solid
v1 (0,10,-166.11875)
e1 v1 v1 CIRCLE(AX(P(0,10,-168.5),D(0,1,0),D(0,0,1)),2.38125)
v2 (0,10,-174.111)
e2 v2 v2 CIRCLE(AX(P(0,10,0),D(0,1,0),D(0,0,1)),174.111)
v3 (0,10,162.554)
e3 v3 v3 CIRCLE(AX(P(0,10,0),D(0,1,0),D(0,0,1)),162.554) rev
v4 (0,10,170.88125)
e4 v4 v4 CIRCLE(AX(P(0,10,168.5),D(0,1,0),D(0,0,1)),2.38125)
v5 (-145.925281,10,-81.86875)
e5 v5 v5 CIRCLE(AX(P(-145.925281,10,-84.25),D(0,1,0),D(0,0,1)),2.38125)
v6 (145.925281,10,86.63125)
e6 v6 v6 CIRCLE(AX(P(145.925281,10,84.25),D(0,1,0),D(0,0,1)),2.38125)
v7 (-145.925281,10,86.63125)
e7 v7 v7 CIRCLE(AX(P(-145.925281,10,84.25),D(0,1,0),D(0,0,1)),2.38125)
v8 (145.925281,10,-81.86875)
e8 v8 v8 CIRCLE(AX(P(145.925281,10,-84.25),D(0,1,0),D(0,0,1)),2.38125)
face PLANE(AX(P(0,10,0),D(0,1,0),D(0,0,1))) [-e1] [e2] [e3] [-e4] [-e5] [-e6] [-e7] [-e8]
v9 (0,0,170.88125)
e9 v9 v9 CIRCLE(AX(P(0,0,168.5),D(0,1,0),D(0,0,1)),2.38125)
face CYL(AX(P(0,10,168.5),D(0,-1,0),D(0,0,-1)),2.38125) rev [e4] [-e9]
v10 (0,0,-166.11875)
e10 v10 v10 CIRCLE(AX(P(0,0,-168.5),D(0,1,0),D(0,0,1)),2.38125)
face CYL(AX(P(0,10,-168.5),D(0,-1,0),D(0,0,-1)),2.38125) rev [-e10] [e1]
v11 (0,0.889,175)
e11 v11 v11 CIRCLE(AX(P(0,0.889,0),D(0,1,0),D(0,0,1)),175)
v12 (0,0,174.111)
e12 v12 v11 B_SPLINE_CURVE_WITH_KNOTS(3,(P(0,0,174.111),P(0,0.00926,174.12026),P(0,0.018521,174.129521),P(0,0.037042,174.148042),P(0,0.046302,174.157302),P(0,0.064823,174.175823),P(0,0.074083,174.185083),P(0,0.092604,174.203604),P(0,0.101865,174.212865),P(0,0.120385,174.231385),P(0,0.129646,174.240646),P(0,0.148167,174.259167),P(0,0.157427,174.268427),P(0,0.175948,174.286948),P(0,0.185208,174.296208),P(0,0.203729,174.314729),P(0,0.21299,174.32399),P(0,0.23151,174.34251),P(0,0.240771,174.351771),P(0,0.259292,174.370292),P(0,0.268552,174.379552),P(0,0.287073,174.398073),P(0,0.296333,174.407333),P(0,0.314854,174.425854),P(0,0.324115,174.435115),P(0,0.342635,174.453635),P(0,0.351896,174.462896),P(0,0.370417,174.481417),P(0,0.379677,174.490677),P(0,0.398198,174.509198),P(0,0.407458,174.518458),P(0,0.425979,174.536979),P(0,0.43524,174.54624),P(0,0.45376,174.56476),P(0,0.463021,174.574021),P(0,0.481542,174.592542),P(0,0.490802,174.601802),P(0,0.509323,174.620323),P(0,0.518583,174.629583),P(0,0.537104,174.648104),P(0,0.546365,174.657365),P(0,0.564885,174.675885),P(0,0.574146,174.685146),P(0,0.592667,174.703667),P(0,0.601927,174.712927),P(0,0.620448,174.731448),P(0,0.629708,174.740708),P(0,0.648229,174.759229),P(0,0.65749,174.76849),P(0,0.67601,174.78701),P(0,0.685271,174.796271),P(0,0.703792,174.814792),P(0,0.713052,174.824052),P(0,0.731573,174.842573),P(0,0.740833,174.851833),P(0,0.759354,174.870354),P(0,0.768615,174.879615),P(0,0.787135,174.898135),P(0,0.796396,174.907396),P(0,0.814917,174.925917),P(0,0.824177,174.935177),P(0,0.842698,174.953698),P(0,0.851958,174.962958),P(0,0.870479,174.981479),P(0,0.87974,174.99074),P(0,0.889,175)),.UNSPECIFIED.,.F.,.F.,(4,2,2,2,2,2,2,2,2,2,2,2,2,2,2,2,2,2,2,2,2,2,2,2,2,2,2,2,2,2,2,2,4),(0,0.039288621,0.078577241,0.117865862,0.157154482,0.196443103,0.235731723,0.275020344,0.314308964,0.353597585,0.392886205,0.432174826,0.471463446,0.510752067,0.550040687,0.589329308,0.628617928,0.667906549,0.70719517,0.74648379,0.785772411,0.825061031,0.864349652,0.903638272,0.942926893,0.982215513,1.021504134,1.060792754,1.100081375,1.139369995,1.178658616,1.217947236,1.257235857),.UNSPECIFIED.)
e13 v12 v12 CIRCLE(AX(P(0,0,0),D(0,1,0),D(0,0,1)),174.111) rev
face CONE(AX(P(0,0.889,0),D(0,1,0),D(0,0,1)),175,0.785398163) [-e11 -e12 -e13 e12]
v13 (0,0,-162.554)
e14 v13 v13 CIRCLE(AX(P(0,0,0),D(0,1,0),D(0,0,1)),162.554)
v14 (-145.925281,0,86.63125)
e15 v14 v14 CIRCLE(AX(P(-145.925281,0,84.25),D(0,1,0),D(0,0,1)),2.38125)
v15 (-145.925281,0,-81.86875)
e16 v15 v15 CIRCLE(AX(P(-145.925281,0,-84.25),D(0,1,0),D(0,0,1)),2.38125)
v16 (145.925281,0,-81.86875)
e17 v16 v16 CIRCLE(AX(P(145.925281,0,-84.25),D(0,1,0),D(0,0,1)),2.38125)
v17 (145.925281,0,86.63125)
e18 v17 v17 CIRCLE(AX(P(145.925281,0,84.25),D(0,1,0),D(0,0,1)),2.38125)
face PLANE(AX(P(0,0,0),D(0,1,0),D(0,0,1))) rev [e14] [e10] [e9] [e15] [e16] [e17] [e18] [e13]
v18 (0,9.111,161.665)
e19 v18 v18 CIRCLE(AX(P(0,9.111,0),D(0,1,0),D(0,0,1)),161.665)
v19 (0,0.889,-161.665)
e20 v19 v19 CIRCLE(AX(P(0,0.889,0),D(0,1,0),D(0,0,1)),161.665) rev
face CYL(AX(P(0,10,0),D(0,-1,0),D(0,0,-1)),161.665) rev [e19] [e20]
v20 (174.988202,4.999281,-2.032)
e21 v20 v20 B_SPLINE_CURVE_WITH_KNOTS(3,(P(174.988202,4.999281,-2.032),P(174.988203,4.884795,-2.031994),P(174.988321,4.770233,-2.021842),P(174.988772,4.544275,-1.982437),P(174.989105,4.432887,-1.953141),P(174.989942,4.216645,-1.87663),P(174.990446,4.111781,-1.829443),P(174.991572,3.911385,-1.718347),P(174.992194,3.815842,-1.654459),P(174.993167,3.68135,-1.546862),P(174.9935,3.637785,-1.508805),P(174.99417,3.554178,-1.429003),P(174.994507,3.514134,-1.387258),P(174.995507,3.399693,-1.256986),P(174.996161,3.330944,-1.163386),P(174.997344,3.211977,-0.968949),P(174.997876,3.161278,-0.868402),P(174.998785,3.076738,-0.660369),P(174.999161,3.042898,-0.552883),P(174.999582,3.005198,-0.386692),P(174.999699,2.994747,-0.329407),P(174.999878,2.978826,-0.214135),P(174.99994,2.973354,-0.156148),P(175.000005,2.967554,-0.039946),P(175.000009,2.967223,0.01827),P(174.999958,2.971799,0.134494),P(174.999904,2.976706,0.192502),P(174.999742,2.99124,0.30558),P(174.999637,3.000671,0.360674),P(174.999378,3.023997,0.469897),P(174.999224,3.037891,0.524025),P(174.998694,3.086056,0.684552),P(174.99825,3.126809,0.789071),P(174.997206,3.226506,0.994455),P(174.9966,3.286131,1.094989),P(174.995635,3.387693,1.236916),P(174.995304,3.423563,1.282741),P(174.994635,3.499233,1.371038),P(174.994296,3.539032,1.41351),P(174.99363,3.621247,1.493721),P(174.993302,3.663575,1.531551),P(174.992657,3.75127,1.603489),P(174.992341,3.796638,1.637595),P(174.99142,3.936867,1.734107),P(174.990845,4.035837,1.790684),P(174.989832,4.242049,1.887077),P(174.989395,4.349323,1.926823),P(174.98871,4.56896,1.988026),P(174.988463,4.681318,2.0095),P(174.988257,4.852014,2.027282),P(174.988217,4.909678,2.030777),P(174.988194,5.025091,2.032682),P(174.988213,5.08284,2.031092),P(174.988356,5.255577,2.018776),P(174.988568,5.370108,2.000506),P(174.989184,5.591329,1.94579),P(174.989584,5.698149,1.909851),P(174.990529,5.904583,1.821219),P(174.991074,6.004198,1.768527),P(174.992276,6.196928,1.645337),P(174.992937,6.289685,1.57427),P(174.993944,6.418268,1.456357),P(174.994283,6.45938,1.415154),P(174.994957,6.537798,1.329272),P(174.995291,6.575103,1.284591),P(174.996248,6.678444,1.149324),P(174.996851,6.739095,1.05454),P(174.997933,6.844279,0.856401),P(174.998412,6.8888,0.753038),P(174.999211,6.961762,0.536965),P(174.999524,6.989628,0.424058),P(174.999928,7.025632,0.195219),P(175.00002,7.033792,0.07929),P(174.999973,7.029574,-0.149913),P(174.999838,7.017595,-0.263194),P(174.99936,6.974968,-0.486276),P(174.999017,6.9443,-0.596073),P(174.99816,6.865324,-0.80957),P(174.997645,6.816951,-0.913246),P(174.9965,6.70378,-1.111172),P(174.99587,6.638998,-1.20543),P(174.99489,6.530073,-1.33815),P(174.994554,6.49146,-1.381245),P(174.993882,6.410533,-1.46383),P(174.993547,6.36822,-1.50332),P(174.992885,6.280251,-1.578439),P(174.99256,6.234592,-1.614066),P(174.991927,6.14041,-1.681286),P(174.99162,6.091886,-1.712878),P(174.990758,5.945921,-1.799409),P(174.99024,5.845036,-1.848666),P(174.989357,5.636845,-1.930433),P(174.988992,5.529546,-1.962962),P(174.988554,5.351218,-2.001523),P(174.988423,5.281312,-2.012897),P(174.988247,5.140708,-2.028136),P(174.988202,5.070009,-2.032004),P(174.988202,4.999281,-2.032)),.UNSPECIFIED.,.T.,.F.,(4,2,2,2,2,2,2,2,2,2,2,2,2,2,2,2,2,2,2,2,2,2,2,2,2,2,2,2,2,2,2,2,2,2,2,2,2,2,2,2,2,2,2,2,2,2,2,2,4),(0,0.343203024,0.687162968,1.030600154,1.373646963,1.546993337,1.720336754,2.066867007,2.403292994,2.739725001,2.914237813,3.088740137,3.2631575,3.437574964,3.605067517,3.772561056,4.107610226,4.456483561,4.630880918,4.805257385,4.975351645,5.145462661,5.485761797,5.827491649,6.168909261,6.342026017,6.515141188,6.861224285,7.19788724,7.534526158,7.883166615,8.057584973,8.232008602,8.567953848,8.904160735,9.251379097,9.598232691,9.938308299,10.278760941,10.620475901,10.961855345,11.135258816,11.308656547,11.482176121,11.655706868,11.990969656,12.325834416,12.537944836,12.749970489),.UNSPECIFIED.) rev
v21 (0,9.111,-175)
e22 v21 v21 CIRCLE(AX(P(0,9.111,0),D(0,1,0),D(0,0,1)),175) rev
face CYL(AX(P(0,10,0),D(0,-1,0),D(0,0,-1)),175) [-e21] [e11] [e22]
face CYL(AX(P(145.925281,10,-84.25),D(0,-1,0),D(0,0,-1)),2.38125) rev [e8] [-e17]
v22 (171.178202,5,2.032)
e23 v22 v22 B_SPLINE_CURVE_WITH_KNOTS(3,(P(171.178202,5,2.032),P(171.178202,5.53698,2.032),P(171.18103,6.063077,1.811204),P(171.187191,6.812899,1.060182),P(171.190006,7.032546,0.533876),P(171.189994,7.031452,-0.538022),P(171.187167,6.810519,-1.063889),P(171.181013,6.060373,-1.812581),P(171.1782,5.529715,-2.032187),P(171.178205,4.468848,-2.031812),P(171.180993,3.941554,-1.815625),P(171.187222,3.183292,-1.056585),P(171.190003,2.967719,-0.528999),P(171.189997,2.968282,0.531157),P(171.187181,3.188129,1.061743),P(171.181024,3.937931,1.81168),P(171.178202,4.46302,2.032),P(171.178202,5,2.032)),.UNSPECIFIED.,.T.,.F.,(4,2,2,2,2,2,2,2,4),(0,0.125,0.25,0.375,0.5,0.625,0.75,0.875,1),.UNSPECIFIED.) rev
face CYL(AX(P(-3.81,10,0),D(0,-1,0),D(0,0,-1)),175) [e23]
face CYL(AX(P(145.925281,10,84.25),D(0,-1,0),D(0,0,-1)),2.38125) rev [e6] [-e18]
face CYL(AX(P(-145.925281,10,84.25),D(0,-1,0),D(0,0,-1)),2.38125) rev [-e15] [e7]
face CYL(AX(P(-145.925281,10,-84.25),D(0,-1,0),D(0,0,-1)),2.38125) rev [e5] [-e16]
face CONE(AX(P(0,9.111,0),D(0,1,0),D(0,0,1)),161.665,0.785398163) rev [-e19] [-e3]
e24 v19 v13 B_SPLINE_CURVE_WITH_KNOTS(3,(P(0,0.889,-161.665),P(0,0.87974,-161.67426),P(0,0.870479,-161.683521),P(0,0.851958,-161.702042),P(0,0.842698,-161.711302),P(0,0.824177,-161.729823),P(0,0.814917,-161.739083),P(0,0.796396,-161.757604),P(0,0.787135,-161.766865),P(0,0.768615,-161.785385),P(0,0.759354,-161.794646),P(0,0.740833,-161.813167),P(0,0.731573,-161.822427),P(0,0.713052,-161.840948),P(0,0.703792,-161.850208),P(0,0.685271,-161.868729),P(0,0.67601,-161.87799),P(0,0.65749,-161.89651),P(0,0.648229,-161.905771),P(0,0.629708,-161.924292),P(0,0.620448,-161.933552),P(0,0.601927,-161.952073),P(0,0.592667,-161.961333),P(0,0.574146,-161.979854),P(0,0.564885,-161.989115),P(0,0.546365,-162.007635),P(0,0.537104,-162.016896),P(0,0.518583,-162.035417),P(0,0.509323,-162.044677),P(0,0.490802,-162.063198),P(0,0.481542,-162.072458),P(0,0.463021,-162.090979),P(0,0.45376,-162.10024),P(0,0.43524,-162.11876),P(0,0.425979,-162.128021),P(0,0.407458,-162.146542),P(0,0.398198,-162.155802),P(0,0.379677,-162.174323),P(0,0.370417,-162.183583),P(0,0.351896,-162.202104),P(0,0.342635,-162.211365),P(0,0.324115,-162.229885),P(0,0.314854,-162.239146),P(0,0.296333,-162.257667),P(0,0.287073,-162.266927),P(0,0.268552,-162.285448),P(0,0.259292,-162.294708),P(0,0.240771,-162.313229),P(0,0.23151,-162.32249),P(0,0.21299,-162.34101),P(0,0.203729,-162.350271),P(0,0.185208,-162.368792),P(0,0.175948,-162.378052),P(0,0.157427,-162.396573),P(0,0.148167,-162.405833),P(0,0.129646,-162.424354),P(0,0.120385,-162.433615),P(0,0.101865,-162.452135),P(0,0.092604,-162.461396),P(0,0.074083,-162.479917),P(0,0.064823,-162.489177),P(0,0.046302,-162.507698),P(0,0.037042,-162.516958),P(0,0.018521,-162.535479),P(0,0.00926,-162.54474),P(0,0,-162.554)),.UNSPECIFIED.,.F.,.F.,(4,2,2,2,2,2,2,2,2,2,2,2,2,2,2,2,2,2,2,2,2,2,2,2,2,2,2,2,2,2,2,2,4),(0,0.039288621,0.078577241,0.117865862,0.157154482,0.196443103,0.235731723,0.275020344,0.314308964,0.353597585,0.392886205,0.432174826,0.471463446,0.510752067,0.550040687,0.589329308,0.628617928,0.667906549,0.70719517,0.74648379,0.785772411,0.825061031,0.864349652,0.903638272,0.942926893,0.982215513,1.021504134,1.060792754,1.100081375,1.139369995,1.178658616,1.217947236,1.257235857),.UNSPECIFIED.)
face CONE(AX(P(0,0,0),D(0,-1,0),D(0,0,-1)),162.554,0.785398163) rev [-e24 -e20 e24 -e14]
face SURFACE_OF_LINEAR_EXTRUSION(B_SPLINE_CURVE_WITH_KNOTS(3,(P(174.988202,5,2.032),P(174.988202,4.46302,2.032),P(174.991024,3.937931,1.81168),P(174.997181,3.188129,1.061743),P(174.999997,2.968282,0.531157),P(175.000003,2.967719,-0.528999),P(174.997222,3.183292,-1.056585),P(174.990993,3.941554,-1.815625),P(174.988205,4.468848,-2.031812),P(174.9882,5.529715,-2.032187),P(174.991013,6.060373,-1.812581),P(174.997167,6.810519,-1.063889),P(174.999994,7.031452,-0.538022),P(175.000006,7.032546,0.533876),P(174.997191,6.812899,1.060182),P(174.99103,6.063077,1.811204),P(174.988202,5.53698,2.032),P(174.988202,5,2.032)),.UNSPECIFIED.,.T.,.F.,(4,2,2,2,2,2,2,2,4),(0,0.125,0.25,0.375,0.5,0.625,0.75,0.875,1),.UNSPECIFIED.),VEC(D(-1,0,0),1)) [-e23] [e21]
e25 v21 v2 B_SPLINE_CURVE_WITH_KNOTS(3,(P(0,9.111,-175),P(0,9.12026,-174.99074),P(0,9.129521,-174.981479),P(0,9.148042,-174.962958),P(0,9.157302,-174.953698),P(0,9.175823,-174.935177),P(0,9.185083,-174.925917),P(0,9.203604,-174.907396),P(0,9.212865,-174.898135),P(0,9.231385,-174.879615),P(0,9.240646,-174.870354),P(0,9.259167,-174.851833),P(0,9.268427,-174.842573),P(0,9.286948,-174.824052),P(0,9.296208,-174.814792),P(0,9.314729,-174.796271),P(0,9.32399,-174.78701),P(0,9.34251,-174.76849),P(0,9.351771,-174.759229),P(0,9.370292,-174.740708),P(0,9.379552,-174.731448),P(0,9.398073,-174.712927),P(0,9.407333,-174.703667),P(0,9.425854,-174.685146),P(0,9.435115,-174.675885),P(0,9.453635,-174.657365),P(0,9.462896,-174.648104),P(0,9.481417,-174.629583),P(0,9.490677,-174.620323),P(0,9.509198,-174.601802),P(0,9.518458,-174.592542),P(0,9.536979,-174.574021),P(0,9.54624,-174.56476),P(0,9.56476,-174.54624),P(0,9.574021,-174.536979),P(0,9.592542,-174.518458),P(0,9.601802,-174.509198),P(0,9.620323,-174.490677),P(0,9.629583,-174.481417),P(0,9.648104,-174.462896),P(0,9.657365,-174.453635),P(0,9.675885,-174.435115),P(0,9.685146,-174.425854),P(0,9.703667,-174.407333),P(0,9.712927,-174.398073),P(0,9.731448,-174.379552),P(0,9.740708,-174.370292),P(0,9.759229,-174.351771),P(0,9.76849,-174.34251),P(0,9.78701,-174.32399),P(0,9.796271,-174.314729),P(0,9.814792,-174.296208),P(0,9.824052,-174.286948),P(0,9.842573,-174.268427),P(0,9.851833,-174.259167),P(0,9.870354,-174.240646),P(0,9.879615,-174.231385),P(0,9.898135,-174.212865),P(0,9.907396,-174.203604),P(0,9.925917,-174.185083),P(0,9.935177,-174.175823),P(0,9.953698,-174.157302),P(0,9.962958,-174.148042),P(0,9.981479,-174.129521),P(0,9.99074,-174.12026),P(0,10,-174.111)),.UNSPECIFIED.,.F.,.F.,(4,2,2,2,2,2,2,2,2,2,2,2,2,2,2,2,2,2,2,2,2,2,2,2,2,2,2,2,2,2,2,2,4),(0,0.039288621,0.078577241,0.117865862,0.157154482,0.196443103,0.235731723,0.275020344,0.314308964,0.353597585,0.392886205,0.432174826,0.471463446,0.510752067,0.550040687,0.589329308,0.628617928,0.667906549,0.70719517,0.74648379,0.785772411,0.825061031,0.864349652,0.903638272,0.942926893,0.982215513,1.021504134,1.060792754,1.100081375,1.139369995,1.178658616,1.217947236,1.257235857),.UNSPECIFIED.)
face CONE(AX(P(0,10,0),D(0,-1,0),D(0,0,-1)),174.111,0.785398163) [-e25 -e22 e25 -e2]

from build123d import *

# Parameters (mm, degrees)
SKETCH1_R            = 175
SKETCH1_R_2          = 161.665
SKETCH1_R_3          = 2.38125
BOSS_EXTRUDE1_DEPTH  = 10
CUT_EXTRUDE1_START   = 171.178202291
CUT_EXTRUDE1_DEPTH   = 4.821797709
CUT_EXTRUDE1_START_2 = 2
CUT_EXTRUDE1_2_DEPTH = 6
CHAMFER1_SIZE        = 0.889


with BuildPart() as part:
    # Sketch1 → Boss-Extrude1 (new body)
    with BuildSketch(Plane(origin=(0, 0, 0), x_dir=(1, 0, 0), z_dir=(0, 1, 0))):
        with Locations(Location((0, 0, 0), (0, 0, 270))):
            Circle(SKETCH1_R)
        with Locations(Location((0, 0, 0), (0, 0, 270))):
            Circle(SKETCH1_R_2, mode=Mode.SUBTRACT)
        with Locations(Location((0, 168.5, 0), (0, 0, 270))):
            Circle(SKETCH1_R_3, mode=Mode.SUBTRACT)
        with Locations(Location((145.925280538, 84.25, 0), (0, 0, 270))):
            Circle(SKETCH1_R_3, mode=Mode.SUBTRACT)
        with Locations(Location((145.925280538, -84.25, 0), (0, 0, 270))):
            Circle(SKETCH1_R_3, mode=Mode.SUBTRACT)
        with Locations(Location((0, -168.5, 0), (0, 0, 270))):
            Circle(SKETCH1_R_3, mode=Mode.SUBTRACT)
        with Locations(Location((-145.925280538, -84.25, 0), (0, 0, 270))):
            Circle(SKETCH1_R_3, mode=Mode.SUBTRACT)
        with Locations(Location((-145.925280538, 84.25, 0), (0, 0, 270))):
            Circle(SKETCH1_R_3, mode=Mode.SUBTRACT)
    extrude(amount=BOSS_EXTRUDE1_DEPTH)

    # Cut-Extrude1: read off the stored shape, not the designer's step
    # Cut-Extrude1 outline → Cut-Extrude1 (cut)
    with BuildSketch(Plane(origin=(0, 0, 0), x_dir=(0, 0, -1), z_dir=(1, 0, 0)).offset(CUT_EXTRUDE1_START)):
        with BuildLine():
            add(Edge.make_bspline(
                [(-2.032, 5), (-2.032, 4.463019904), (-1.811680416, 3.937931056), (-1.061743192, 3.188128657), (-0.531157275, 2.968281859), (0.528998518, 2.967718714), (1.056585006, 3.183292038), (1.81562455, 3.941554355), (2.031812274, 4.468847604), (2.032187472, 5.529715077), (1.812580645, 6.060372732), (1.063888553, 6.810519282), (0.538021986, 7.031452247), (-0.533876497, 7.032545639), (-1.06018224, 6.812899427), (-1.811203542, 6.063076876), (-2.032, 5.536980096), (-2.032, 5)],
                knots=[0, 0, 0, 0, 0.125, 0.125, 0.25, 0.25, 0.375, 0.375, 0.5, 0.5, 0.625, 0.625, 0.75, 0.75, 0.875, 0.875, 1, 1, 1, 1], degree=3))
        make_face()
    extrude(amount=CUT_EXTRUDE1_DEPTH, mode=Mode.SUBTRACT)

    # Cut-Extrude1 2 outline → Cut-Extrude1 2 (add)
    with BuildSketch(Plane(origin=(0, 0, 0), x_dir=(1, 0, 0), z_dir=(0, 1, 0)).offset(CUT_EXTRUDE1_START_2)):
        with BuildLine():
            ThreePointArc((171.178202391, -2.032), (171.19, 4.7e-08), (171.17820239, 2.032000094))
            Line((171.17820239, 2.032000094), (171.178202391, -2.032))
        make_face()
    extrude(amount=CUT_EXTRUDE1_2_DEPTH)

    # Chamfer1
    chamfer1_edges = [part.edges().sort_by_distance(p)[0] for p in [
        (0, 0, -175),
        (0, 10, -175),
        (0, 0, -161.665),
        (0, 10, -161.665),
    ]]
    chamfer(chamfer1_edges, length=CHAMFER1_SIZE)


solid = part.part
